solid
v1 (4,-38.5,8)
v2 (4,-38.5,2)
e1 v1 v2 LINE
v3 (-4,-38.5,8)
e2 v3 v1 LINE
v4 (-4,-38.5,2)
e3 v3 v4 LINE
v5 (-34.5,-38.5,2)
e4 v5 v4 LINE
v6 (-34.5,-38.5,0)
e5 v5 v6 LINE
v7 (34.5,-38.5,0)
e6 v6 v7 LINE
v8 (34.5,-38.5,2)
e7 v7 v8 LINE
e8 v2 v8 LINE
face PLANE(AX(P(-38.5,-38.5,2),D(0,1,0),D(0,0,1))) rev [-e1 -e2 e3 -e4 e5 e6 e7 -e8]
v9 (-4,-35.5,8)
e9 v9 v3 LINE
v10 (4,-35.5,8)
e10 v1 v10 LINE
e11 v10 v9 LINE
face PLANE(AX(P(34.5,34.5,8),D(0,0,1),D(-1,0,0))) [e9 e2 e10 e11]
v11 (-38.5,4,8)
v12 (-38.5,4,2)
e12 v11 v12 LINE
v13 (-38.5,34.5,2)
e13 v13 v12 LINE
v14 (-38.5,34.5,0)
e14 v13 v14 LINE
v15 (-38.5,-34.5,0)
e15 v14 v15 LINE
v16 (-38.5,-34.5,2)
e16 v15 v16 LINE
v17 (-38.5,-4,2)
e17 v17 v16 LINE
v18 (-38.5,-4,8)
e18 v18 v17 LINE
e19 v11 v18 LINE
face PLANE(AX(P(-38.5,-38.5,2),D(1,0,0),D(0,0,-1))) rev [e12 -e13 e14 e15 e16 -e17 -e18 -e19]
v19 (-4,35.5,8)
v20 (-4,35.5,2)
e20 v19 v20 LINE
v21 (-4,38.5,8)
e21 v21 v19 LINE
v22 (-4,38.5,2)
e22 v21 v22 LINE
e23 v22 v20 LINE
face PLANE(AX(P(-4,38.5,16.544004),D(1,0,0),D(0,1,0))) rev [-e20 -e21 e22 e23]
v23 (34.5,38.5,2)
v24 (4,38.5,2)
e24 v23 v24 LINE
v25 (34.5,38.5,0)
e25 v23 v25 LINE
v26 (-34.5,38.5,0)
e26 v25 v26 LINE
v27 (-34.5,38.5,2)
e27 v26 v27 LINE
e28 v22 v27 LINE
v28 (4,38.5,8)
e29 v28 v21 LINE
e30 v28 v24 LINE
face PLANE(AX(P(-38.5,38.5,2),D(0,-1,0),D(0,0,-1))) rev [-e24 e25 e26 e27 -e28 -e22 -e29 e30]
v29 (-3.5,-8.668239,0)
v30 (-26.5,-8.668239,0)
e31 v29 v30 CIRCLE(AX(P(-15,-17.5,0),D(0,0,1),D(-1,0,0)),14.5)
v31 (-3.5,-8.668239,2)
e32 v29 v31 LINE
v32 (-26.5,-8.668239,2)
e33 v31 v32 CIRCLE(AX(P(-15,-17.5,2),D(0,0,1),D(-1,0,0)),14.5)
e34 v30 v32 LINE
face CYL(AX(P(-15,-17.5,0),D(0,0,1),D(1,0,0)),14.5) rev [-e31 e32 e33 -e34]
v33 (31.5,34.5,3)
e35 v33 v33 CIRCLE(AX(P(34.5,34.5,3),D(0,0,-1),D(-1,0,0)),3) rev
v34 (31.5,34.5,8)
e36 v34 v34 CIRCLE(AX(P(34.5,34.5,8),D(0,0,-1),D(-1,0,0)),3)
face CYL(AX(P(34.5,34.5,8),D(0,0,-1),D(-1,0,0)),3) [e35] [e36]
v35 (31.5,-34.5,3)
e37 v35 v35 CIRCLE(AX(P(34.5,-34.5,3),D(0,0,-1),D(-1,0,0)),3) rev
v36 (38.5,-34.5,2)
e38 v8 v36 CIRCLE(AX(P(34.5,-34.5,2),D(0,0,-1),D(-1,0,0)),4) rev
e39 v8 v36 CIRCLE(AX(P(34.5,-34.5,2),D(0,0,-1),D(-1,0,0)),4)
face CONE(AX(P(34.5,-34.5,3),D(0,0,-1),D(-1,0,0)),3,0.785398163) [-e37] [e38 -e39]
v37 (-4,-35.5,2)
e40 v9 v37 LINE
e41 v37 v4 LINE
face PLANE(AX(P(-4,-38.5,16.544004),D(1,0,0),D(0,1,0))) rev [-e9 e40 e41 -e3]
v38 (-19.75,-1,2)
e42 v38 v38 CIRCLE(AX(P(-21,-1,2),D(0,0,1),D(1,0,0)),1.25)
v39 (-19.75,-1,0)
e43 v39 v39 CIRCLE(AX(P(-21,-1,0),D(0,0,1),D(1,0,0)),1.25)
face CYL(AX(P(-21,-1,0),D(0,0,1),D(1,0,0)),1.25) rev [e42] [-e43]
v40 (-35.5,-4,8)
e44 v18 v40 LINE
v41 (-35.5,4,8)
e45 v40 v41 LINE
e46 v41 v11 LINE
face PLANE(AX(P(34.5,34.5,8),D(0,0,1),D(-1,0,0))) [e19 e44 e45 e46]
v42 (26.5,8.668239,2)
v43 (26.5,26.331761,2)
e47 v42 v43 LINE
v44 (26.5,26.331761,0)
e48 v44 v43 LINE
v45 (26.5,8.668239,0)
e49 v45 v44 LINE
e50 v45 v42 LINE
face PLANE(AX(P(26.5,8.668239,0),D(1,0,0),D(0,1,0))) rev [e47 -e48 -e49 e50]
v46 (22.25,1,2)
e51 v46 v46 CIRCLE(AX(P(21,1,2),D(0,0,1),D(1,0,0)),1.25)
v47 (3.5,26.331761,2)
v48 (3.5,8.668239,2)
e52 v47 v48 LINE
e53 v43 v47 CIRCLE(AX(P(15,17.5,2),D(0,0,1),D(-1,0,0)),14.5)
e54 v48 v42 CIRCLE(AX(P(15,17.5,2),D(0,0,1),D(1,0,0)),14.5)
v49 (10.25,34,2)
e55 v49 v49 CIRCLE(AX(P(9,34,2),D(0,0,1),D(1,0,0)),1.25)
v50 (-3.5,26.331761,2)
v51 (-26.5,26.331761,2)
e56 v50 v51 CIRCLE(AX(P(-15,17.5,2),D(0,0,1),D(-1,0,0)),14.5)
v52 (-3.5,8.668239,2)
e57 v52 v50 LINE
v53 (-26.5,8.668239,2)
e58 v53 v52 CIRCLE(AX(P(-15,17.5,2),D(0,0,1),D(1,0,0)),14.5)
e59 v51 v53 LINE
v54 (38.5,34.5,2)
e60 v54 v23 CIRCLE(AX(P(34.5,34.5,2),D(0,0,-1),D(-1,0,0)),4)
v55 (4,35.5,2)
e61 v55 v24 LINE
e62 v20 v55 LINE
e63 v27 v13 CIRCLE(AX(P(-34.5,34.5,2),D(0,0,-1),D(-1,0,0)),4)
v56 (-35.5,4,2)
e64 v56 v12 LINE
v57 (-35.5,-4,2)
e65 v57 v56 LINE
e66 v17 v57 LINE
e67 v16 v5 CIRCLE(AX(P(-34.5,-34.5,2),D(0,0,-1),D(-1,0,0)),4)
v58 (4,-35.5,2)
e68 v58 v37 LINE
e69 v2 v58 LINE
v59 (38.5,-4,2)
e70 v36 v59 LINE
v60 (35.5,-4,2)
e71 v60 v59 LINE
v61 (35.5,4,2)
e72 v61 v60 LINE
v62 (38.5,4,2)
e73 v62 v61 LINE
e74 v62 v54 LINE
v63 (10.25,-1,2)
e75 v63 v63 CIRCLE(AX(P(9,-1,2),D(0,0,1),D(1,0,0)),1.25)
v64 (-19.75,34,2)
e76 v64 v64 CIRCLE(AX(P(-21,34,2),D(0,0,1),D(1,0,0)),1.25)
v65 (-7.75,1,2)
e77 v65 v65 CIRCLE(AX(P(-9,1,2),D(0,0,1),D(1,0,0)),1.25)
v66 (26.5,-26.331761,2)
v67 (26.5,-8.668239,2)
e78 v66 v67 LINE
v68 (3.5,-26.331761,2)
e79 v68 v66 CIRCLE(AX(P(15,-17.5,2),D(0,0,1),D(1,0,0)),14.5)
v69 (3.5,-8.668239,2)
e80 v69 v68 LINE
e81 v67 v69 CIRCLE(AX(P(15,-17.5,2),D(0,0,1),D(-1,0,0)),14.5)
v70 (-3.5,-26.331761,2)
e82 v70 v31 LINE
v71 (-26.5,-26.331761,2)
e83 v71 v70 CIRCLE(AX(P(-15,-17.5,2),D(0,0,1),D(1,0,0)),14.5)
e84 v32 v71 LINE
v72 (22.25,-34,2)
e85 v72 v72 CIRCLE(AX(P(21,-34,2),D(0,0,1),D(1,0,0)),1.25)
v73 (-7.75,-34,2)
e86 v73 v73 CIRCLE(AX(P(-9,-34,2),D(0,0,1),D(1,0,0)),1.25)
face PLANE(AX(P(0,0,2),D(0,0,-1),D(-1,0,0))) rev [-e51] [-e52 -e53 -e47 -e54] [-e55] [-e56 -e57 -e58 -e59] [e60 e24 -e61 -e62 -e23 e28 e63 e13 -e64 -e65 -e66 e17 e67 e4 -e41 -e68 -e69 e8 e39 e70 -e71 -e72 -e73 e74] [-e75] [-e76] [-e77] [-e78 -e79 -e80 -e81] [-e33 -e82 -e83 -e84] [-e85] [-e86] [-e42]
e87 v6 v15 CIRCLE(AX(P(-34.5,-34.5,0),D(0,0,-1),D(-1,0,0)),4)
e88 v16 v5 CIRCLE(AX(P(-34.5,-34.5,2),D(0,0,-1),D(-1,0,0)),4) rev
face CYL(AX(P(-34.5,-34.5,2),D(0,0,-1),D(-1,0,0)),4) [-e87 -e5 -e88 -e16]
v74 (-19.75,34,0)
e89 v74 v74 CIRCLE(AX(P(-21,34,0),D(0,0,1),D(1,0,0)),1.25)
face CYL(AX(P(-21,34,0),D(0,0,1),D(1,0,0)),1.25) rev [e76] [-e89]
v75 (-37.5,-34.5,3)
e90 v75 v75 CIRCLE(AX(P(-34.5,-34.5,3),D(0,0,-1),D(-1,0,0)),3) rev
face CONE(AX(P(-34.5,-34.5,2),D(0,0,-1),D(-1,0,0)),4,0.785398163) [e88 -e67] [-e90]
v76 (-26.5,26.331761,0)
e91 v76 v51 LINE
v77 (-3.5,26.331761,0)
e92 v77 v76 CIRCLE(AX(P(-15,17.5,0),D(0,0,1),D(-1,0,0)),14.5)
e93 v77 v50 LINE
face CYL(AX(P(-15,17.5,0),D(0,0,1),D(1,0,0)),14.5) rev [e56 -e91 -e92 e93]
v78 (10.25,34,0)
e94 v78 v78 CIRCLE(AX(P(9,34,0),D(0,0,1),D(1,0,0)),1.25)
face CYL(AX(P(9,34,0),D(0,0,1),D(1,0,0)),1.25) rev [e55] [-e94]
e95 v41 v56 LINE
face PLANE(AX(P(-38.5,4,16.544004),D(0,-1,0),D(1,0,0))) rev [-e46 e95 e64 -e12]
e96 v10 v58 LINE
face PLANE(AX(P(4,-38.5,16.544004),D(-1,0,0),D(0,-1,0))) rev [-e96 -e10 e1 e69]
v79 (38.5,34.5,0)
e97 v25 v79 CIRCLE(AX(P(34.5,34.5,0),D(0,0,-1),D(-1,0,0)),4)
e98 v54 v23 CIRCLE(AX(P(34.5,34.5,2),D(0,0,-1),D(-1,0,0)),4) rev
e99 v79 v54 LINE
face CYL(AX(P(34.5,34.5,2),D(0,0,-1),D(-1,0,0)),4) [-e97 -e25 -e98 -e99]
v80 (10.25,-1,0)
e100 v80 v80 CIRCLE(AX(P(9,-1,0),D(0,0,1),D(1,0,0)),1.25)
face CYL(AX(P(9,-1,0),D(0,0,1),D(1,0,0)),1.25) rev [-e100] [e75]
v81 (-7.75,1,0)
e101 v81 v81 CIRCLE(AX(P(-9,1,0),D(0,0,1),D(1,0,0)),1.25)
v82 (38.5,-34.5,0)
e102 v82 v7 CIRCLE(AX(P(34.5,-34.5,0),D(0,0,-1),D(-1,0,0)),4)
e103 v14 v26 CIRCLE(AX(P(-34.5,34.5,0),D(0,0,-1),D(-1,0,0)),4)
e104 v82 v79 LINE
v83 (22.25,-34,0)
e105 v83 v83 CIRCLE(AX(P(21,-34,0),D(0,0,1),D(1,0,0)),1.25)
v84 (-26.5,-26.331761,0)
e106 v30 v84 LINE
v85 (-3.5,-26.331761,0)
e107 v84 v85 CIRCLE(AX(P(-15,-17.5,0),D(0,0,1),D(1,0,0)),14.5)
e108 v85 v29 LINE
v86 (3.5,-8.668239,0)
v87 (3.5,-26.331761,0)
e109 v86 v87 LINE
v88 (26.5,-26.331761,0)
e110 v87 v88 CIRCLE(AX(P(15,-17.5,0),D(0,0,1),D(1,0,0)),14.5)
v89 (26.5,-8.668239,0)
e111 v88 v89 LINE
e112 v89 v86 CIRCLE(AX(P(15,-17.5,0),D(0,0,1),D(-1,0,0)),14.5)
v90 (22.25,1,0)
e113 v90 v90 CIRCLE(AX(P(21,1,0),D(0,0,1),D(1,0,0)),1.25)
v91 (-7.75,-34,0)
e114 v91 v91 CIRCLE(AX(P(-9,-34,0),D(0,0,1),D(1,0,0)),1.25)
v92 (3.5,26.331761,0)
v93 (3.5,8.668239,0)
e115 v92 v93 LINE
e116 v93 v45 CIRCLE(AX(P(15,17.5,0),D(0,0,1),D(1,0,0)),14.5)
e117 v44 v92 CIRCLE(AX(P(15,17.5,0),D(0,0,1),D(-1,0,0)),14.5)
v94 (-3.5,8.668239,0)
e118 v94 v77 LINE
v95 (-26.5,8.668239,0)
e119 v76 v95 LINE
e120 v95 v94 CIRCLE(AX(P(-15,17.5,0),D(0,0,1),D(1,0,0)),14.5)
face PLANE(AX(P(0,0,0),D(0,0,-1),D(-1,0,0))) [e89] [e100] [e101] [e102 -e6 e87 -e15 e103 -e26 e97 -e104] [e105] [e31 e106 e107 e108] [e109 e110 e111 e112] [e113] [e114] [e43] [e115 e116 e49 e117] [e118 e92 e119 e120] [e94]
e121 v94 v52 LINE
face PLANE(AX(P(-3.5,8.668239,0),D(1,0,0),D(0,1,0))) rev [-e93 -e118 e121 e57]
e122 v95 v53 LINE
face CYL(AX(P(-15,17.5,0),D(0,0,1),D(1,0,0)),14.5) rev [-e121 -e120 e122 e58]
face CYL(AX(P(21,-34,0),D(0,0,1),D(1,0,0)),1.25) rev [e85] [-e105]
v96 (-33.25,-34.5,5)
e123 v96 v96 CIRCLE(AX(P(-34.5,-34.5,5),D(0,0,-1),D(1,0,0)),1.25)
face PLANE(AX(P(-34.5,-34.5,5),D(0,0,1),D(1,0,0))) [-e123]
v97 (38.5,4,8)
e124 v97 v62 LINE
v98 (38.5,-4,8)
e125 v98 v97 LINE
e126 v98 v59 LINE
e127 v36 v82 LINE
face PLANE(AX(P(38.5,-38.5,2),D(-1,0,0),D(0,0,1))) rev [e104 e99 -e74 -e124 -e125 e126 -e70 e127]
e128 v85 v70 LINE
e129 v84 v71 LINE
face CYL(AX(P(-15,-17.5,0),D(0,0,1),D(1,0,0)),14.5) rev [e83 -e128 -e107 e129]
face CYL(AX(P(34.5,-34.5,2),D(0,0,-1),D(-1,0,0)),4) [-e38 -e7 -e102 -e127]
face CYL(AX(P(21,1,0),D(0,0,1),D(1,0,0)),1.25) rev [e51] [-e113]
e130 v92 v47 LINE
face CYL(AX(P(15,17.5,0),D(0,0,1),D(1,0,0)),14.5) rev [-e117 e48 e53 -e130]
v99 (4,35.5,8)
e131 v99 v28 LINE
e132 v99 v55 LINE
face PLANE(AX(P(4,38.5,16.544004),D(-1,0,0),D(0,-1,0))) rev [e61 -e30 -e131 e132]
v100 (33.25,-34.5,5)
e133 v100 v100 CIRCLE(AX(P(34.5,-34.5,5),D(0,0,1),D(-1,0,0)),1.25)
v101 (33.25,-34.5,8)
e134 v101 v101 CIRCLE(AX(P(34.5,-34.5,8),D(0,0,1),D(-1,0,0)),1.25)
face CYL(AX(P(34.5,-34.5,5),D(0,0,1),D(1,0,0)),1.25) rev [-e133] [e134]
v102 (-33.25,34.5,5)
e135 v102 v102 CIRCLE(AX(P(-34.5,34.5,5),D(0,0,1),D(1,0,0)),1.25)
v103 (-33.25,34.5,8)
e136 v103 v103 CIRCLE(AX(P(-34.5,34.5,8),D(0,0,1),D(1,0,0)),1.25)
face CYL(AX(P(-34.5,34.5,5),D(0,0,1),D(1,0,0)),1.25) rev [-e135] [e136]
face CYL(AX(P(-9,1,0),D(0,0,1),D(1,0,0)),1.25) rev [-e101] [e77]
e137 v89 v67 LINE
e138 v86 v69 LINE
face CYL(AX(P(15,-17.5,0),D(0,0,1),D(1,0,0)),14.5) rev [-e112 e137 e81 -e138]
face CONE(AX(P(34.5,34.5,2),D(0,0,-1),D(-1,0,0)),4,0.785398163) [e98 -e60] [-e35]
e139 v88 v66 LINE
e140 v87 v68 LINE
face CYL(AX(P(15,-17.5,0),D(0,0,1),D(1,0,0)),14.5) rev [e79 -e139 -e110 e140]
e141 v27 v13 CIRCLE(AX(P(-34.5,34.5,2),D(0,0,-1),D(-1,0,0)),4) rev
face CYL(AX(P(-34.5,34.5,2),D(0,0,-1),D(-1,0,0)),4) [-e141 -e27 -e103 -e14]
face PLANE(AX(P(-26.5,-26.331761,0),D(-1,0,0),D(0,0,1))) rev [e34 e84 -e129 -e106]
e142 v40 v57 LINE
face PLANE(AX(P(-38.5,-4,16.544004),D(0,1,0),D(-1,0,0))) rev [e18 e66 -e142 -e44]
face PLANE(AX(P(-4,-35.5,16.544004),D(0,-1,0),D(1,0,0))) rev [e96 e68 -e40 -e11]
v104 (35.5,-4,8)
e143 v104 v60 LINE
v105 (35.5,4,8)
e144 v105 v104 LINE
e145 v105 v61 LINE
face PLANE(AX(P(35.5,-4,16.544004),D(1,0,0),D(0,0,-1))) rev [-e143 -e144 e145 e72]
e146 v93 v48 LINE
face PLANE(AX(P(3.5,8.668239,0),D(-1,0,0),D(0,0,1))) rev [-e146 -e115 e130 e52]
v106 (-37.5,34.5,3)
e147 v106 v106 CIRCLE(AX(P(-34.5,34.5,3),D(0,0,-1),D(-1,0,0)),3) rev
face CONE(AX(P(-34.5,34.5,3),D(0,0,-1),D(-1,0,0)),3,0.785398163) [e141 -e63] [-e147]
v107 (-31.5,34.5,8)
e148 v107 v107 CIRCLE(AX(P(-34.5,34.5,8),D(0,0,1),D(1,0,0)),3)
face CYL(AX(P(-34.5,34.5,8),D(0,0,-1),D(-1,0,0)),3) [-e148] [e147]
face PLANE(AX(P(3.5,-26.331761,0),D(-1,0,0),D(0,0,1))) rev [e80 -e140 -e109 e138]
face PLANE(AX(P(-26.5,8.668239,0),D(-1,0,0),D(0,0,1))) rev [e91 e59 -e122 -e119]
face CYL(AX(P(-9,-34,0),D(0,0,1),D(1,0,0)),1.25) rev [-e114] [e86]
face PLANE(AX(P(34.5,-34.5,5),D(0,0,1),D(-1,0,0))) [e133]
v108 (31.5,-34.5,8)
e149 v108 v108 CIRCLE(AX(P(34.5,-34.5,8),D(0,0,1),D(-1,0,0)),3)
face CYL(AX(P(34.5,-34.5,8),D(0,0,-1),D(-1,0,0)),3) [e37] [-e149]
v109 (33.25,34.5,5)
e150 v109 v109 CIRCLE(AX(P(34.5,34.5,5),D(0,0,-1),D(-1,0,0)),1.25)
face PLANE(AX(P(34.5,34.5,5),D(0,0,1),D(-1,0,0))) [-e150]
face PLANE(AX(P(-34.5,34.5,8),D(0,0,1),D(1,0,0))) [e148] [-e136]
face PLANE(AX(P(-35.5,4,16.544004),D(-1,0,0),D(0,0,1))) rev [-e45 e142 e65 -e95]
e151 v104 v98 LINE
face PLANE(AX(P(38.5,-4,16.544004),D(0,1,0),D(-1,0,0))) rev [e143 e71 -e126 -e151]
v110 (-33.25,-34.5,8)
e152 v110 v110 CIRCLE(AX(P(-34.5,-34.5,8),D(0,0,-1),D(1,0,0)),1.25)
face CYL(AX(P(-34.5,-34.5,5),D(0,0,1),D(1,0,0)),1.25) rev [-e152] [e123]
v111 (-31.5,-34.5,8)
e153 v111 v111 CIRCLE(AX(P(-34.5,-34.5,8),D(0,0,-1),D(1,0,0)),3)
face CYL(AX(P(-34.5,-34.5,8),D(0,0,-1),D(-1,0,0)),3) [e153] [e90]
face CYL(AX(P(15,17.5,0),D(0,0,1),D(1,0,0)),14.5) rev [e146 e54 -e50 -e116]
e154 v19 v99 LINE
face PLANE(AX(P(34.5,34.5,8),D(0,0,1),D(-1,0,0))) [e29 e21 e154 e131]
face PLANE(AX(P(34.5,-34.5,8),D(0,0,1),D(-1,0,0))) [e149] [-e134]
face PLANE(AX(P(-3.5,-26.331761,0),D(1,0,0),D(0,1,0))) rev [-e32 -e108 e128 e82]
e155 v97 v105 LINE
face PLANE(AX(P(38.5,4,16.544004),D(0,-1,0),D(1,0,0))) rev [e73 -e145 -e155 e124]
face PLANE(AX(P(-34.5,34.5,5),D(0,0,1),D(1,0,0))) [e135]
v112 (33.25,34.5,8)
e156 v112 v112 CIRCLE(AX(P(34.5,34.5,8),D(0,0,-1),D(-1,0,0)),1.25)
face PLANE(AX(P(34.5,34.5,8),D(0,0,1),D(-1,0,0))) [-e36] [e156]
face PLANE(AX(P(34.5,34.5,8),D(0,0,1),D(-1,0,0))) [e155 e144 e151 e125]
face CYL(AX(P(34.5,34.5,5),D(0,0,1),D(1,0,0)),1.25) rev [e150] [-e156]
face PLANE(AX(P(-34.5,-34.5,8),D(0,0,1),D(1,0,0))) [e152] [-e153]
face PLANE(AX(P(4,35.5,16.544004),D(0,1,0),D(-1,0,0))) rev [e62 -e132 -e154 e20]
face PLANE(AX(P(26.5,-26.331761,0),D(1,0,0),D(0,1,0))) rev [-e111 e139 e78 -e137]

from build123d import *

# Parameters (mm, degrees)
SKETCH1_W               = 77
SKETCH1_H               = 77
BOSS_EXTRUDE1_DEPTH     = 2
CUT_EXTRUDE1_DEPTH      = 55.483942589
SKETCH3_R               = 1.25
CUT_EXTRUDE6_DEPTH      = 55.483942589
LPATTERN1_COUNT         = 2
LPATTERN1_PITCH         = 35
LPATTERN1_COUNT_DIR2    = 2
LPATTERN1_PITCH_DIR2    = 30
FILLET1_R               = 4
SKETCH25_R              = 3
BOSS_EXTRUDE4_DEPTH     = 6
SKETCH26_R              = 1.25
CUT_EXTRUDE9_DEPTH      = 3
MIRROR3_COPY_1_SKETCH_R = 3
MIRROR3_COPY_1_DEPTH    = 6
MIRROR3_COPY_2_SKETCH_R = 1.25
MIRROR3_COPY_2_DEPTH    = 3
CHAMFER1_SIZE           = 1
SKETCH27_W              = 3
SKETCH27_H              = 8
BOSS_EXTRUDE5_DEPTH     = 8
CIRPATTERN1_COUNT       = 4


with BuildPart() as part:
    # Sketch1 → Boss-Extrude1 (new body)
    with BuildSketch(Plane.XY):
        Rectangle(SKETCH1_W, SKETCH1_H)
    extrude(amount=BOSS_EXTRUDE1_DEPTH)

    # Sketch2 → Cut-Extrude1 (cut, through all)
    with BuildSketch(Plane.XY.offset(2)):
        with BuildLine():
            Line((-26.5, 8.668239134), (-26.5, 26.331760866))
            ThreePointArc((-26.5, 26.331760866), (-15, 32), (-3.5, 26.331760866))
            Line((-3.5, 26.331760866), (-3.5, 8.668239134))
            ThreePointArc((-3.5, 8.668239134), (-15, 3), (-26.5, 8.668239134))
        make_face()
    cut_extrude1 = extrude(amount=-CUT_EXTRUDE1_DEPTH, mode=Mode.SUBTRACT)

    # Sketch3 → Cut-Extrude6 (cut, through all)
    with BuildSketch(Plane.XY.offset(2)):
        with Locations((-21, 34)):
            Circle(SKETCH3_R)
        with Locations((-9, 1)):
            Circle(SKETCH3_R)
    cut_extrude6 = extrude(amount=-CUT_EXTRUDE6_DEPTH, mode=Mode.SUBTRACT)

    # LPattern1: Cut-Extrude1, Cut-Extrude6 2 × 2
    with Locations(*[(j * LPATTERN1_PITCH_DIR2, -i * LPATTERN1_PITCH, 0) for i in range(LPATTERN1_COUNT) for j in range(LPATTERN1_COUNT_DIR2) if (i, j) != (0, 0)]):
        add(cut_extrude1, mode=Mode.SUBTRACT)
        add(cut_extrude6, mode=Mode.SUBTRACT)

    # Fillet1
    fillet1_edges = [part.edges().sort_by_distance(p)[0] for p in [
        (38.5, -38.5, 1),
        (-38.5, -38.5, 1),
        (-38.5, 38.5, 1),
        (38.5, 38.5, 1),
    ]]
    fillet(fillet1_edges, radius=FILLET1_R)

    # Sketch25 → Boss-Extrude4 (add)
    with BuildSketch(Plane.XY.offset(2)):
        with Locations(Location((-34.5, 34.5, 0), (0, 0, 180))):
            Circle(SKETCH25_R)
    boss_extrude4 = extrude(amount=BOSS_EXTRUDE4_DEPTH)

    # Sketch26 → Cut-Extrude9 (cut)
    with BuildSketch(Plane.XY.offset(8)):
        with Locations((-34.5, 34.5)):
            Circle(SKETCH26_R)
    cut_extrude9 = extrude(amount=-CUT_EXTRUDE9_DEPTH, mode=Mode.SUBTRACT)

    # Mirror2: Boss-Extrude4, Cut-Extrude9 across plane
    add(boss_extrude4.mirror(Plane(origin=(0, 0, 0), x_dir=(0, 0, 1), z_dir=(1, 0, 0))))
    add(cut_extrude9.mirror(Plane(origin=(0, 0, 0), x_dir=(0, 0, 1), z_dir=(1, 0, 0))), mode=Mode.SUBTRACT)

    # Mirror3: Boss-Extrude4, Cut-Extrude9 across plane
    add(boss_extrude4.mirror(Plane.ZX))
    add(cut_extrude9.mirror(Plane.ZX), mode=Mode.SUBTRACT)

    # Mirror3 copy 1 sketch → Mirror3 copy 1 (add)
    with BuildSketch(Plane(origin=(0, 0, 2), x_dir=(-1, 0, 0), z_dir=(0, 0, 1))):
        with Locations(Location((-34.5, 34.5, 0), (0, 0, 180))):
            Circle(MIRROR3_COPY_1_SKETCH_R)
    extrude(amount=MIRROR3_COPY_1_DEPTH)

    # Mirror3 copy 2 sketch → Mirror3 copy 2 (cut)
    with BuildSketch(Plane(origin=(0, 0, 8), x_dir=(-1, 0, 0), z_dir=(0, 0, 1))):
        with Locations((-34.5, 34.5)):
            Circle(MIRROR3_COPY_2_SKETCH_R)
    extrude(amount=-MIRROR3_COPY_2_DEPTH, mode=Mode.SUBTRACT)

    # Chamfer1
    chamfer1_edges = [part.edges().sort_by_distance(p)[0] for p in [
        (-31.5, 34.5, 2),
        (31.5, 34.5, 2),
        (31.5, -34.5, 2),
        (-31.5, -34.5, 2),
    ]]
    chamfer(chamfer1_edges, length=CHAMFER1_SIZE - 0.0001)  # a hair under: the kernel refuses the full size

    # Sketch27 → Boss-Extrude5 (add)
    with BuildSketch(Plane.XY):
        with Locations((37, 0)):
            Rectangle(SKETCH27_W, SKETCH27_H)
    boss_extrude5 = extrude(amount=BOSS_EXTRUDE5_DEPTH)

    # CirPattern1: Boss-Extrude5 ×4 about axis
    cirpattern1_axis = Axis((0, 0, 0), (0, 0, 1))
    for i in range(1, CIRPATTERN1_COUNT):
        add(boss_extrude5.rotate(cirpattern1_axis, i * 360 / CIRPATTERN1_COUNT))


solid = part.part
